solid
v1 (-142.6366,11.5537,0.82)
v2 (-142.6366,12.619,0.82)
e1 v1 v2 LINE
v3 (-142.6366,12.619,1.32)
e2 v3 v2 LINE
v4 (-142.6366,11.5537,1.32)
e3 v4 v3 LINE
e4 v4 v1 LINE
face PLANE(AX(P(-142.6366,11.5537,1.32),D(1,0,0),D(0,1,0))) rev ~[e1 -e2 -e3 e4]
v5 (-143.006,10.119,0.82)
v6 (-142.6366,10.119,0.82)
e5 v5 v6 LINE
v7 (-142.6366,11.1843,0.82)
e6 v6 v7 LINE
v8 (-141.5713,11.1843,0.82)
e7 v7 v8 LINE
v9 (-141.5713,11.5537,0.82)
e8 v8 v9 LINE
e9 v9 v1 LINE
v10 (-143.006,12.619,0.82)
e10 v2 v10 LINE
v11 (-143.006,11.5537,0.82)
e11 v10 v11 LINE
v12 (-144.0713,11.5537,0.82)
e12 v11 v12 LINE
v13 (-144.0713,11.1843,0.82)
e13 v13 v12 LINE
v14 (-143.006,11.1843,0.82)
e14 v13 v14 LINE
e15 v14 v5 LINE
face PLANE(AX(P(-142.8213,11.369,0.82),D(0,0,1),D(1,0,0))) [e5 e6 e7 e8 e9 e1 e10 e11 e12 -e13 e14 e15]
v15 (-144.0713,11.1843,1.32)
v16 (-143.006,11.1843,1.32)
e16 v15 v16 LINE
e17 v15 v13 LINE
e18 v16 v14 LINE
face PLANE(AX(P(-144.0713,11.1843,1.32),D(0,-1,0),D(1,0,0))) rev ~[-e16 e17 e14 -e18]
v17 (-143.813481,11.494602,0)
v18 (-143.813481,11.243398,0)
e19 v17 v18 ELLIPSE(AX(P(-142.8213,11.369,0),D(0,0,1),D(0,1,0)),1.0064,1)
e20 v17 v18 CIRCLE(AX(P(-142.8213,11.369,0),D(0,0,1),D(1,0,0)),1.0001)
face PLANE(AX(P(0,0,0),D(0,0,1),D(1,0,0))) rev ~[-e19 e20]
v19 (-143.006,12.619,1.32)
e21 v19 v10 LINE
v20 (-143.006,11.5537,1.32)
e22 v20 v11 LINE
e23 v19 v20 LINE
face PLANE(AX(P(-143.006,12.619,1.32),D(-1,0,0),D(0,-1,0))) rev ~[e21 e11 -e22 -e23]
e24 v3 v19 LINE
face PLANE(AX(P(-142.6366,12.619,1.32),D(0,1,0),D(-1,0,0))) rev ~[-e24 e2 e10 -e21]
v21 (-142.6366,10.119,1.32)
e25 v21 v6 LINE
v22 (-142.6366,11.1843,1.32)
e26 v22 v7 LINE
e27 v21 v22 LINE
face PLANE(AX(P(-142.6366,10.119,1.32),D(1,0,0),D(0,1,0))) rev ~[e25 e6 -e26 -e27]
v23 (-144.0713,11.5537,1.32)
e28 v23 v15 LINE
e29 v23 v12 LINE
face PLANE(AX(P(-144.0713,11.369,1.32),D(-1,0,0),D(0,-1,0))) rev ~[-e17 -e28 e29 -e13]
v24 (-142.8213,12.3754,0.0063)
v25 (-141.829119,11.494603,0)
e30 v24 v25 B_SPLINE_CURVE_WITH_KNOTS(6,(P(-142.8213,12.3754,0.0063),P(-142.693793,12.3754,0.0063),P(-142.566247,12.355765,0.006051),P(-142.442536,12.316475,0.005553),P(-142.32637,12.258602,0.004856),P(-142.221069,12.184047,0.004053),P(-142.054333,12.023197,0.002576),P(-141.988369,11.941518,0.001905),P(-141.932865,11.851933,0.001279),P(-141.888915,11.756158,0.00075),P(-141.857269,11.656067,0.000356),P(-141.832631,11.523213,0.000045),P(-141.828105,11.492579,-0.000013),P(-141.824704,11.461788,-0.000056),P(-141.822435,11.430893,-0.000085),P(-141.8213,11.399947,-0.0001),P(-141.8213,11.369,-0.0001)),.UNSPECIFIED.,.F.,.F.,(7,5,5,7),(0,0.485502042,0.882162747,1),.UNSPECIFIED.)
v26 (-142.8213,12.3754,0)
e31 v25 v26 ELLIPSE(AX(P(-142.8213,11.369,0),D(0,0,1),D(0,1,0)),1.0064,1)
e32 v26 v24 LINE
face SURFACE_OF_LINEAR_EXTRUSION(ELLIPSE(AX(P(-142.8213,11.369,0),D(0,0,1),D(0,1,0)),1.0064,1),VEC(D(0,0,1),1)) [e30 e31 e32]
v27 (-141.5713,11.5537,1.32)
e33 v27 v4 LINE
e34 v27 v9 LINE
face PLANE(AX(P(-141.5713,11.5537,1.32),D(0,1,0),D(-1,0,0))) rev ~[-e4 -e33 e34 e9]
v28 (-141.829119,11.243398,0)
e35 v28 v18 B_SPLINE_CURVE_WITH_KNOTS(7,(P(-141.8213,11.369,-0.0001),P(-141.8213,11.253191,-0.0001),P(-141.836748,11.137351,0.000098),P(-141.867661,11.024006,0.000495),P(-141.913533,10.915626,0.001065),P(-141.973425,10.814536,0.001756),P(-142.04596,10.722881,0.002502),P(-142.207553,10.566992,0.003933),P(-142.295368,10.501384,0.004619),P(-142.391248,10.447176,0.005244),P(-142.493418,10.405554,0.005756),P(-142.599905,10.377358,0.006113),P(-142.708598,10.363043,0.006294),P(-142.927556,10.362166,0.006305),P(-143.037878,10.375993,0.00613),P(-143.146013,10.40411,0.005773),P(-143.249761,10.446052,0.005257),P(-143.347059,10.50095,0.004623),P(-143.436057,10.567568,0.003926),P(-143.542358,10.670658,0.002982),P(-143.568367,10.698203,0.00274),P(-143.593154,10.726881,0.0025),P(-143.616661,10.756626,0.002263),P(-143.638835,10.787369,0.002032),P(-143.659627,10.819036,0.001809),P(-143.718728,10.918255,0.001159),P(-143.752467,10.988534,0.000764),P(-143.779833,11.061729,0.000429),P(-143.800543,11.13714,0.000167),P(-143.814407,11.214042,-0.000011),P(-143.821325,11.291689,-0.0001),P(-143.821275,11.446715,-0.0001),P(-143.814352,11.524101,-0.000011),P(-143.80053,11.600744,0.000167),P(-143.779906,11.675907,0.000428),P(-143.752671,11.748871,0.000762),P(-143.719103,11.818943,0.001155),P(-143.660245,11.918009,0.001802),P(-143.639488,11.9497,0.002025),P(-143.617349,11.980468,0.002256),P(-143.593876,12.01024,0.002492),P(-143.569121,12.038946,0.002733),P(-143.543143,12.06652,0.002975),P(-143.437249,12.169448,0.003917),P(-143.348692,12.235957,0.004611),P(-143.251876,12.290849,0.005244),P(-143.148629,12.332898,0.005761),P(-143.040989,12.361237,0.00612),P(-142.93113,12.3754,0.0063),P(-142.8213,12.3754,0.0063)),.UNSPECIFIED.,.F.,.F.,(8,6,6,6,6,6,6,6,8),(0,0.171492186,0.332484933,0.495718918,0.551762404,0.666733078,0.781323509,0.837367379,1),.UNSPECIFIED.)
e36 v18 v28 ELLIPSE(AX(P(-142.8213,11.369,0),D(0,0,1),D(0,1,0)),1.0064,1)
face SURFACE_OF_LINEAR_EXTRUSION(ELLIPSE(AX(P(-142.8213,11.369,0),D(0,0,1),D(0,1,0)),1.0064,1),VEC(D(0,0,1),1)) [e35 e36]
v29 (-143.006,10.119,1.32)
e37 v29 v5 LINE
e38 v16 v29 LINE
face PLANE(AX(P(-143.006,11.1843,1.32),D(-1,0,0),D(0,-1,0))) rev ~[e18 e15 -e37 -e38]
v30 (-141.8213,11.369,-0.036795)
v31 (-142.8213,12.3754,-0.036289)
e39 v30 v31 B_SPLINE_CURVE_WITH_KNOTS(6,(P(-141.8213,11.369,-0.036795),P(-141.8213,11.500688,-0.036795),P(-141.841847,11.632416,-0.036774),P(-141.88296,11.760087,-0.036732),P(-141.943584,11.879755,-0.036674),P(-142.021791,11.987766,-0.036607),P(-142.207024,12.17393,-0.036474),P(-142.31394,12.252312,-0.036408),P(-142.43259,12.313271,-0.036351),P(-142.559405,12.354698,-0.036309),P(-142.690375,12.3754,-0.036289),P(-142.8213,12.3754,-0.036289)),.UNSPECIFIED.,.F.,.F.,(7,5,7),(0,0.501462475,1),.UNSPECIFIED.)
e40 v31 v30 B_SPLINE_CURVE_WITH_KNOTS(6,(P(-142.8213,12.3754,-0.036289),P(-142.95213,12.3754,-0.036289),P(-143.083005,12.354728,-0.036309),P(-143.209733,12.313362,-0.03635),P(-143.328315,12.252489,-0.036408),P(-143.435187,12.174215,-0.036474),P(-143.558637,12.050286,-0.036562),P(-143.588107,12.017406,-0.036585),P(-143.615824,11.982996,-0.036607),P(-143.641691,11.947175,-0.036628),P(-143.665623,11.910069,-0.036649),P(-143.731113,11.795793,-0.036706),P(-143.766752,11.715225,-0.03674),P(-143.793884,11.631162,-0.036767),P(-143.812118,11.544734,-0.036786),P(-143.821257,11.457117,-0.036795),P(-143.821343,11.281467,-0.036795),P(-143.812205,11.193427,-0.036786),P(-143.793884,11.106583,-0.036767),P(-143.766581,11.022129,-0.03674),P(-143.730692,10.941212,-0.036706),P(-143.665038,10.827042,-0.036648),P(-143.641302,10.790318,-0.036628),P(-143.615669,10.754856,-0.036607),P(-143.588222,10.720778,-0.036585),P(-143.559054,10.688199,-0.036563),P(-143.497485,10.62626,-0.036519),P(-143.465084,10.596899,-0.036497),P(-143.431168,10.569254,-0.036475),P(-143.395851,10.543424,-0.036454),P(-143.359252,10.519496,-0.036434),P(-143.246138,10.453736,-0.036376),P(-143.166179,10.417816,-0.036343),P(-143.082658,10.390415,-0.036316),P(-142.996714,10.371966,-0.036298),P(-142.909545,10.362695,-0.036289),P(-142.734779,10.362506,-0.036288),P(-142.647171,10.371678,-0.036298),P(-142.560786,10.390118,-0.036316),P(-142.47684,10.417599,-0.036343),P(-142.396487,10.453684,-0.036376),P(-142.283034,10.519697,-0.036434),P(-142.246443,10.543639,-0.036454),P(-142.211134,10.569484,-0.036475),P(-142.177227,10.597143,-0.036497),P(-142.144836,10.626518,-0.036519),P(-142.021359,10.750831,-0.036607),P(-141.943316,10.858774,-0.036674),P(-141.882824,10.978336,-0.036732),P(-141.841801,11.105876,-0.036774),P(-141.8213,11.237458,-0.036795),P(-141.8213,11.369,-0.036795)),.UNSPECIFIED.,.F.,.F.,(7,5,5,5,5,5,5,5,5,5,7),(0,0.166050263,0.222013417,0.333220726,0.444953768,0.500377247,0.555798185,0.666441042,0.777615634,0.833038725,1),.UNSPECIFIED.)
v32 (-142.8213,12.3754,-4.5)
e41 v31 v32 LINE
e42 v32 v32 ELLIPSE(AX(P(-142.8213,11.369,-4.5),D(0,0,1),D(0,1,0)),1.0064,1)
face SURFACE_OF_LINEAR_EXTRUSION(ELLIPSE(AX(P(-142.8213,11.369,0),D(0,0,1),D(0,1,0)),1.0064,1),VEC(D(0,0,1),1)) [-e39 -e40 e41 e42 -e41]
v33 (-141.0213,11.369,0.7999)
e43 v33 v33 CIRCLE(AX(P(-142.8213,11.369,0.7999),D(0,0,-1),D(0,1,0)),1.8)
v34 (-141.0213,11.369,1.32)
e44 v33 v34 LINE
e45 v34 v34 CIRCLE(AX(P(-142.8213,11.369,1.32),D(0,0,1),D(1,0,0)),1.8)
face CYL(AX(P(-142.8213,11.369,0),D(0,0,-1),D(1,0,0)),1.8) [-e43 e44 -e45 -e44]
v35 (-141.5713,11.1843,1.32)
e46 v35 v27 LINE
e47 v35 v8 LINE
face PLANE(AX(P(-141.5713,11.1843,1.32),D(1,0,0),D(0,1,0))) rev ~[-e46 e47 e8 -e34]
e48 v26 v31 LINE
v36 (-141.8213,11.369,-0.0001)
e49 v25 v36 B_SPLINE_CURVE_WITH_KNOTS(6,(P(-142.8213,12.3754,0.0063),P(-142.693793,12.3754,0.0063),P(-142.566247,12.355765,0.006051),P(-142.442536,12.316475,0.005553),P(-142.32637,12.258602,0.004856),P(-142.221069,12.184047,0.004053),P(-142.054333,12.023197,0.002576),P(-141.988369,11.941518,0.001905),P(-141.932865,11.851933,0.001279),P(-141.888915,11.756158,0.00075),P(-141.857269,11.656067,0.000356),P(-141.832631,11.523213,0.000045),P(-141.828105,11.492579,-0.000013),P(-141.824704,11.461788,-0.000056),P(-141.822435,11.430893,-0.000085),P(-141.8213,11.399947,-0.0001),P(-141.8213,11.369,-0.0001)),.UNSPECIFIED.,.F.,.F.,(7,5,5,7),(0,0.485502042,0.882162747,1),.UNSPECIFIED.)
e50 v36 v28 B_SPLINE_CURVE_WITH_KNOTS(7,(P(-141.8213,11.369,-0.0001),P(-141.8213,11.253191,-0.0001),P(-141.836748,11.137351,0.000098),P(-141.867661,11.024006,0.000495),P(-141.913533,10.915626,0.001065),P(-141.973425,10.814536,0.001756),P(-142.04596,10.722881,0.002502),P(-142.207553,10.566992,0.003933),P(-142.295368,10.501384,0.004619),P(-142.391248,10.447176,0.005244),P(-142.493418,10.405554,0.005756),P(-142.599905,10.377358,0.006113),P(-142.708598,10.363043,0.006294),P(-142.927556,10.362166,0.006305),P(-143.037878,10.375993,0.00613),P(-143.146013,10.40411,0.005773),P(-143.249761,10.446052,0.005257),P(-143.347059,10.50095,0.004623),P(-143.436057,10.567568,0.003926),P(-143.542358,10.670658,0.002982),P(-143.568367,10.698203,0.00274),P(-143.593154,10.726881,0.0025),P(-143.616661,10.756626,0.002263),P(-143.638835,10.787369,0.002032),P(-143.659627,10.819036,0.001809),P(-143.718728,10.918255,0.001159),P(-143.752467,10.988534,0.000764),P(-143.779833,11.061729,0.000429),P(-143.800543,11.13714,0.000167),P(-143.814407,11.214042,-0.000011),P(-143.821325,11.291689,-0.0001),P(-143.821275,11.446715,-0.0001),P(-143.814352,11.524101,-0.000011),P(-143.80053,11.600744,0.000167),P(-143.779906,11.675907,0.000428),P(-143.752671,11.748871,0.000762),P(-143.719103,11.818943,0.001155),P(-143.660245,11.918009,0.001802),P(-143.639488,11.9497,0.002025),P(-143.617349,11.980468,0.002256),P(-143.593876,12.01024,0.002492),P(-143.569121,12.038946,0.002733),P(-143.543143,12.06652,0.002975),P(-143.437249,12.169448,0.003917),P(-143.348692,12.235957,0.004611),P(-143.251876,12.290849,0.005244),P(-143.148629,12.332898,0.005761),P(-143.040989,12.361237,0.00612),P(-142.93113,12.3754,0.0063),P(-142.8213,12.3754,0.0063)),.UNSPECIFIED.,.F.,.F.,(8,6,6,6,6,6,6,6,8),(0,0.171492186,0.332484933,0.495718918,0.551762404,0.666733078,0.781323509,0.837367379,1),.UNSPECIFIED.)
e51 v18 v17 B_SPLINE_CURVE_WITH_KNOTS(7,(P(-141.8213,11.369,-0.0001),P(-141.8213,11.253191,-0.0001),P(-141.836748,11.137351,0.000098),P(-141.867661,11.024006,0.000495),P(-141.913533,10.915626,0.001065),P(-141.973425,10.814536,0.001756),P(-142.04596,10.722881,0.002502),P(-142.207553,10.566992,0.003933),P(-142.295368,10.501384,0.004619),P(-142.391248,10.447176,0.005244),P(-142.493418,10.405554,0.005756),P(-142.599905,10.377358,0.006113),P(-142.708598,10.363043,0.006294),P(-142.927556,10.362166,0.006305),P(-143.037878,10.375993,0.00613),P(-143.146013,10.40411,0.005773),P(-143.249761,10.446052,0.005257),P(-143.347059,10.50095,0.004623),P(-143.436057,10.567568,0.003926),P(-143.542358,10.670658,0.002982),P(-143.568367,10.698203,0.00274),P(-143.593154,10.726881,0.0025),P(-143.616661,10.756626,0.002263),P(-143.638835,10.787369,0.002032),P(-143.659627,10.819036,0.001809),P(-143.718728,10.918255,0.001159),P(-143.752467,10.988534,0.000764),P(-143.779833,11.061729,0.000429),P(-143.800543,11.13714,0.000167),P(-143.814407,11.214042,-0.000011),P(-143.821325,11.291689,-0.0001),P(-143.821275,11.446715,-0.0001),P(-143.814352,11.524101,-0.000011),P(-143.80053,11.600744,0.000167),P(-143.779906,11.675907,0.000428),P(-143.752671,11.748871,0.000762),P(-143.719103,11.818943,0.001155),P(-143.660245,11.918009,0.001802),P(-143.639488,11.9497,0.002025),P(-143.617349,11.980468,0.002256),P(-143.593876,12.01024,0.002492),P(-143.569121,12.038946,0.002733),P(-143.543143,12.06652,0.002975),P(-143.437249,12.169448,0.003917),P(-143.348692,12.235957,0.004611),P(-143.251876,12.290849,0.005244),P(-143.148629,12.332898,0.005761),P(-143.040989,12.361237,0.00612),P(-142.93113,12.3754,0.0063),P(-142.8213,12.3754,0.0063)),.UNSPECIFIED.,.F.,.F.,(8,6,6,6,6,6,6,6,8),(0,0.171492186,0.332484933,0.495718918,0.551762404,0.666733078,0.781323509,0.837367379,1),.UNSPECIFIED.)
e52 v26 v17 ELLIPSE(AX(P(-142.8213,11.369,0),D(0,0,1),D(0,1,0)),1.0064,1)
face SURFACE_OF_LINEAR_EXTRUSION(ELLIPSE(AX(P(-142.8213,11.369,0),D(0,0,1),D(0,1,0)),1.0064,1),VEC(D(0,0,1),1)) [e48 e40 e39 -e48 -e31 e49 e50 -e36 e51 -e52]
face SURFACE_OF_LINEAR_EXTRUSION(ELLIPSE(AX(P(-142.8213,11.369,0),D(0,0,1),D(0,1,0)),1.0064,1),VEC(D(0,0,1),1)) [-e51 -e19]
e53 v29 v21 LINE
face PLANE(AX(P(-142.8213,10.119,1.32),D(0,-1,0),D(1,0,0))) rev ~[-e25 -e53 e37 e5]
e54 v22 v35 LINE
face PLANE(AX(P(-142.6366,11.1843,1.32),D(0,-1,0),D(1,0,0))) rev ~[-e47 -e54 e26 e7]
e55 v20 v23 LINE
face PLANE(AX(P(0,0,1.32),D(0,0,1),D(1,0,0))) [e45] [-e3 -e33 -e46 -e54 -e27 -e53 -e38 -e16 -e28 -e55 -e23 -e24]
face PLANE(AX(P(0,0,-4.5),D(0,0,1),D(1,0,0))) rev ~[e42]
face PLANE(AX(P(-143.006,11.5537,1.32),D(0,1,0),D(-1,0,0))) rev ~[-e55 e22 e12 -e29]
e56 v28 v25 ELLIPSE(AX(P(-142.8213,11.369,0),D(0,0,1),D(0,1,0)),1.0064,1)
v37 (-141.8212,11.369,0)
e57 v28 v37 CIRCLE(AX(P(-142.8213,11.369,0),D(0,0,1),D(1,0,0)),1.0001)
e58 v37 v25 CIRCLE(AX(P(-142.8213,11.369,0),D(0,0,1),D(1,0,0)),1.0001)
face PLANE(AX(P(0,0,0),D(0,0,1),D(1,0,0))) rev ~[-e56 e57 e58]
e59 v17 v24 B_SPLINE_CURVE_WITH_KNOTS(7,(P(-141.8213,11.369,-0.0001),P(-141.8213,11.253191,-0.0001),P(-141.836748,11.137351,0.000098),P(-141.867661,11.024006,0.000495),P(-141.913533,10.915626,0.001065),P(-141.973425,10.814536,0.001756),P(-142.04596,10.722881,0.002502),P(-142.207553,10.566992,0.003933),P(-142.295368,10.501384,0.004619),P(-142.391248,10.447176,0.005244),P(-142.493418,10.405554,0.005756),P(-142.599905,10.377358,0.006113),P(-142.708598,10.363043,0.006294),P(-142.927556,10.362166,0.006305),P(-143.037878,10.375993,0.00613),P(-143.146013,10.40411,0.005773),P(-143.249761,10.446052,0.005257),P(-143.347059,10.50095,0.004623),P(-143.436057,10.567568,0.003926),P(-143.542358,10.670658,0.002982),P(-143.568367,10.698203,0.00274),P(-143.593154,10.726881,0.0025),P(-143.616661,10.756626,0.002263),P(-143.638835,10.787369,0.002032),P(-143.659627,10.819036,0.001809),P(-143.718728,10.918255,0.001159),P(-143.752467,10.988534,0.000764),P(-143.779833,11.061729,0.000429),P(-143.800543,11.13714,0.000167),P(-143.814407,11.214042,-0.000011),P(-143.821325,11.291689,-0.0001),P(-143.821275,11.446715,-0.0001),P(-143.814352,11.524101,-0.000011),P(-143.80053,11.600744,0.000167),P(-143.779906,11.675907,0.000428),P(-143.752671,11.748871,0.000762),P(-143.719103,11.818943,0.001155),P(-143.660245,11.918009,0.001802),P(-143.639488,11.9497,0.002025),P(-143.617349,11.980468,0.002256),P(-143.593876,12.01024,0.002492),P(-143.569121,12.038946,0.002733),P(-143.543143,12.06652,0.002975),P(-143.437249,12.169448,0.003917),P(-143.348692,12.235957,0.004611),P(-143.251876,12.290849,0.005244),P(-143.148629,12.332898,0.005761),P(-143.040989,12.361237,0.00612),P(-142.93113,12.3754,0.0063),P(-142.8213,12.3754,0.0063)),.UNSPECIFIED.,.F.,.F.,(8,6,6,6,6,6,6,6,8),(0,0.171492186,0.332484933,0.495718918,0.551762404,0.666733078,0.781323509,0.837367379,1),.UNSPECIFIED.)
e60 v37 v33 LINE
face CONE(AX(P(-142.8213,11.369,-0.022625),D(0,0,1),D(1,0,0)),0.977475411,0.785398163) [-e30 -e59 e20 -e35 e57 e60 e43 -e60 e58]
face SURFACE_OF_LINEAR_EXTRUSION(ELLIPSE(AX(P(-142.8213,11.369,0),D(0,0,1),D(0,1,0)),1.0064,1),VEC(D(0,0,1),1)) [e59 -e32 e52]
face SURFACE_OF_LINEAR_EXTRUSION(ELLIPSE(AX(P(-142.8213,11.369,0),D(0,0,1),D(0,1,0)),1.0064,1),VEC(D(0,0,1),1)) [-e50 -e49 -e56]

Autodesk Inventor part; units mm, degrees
ref_plane "YZ Plane" through (0, 0, 0) normal (1, 0, 0) x (0, 1, 0)
ref_plane "XZ Plane" through (0, 0, 0) normal (0, 1, 0) x (-1, 0, 0)
ref_plane "XY Plane" through (0, 0, 0) normal (0, 0, 1) x (1, 0, 0)
sketch "Sketch1" plane through (0, 0, 0) normal (0, 0, 1) x (1, 0, 0)
  ellipse E0 centre (-142.8213, 11.369) end of major axis (-142.8213, 12.3754) minor radius 1
  point P0 (0, 0)
  dimension "d1" = 1.0064
extrude "Extrusion1" add sketch "Sketch1" against normal blind 4.5
sketch "Sketch2" plane through (0, 0, 0) normal (0, 0, 1) x (1, 0, 0)
  ellipse E0 centre (-142.8213, 11.369) end of major axis (-142.8213, 12.3754) minor radius 1 projected
  circle A0 centre (-142.8213, 11.369) radius 1.8
  point P0 (0, 0)
  dimension "d4" = 3.6
extrude "Extrusion2" add sketch "Sketch2" along normal blind 1.32 contours E0 | A0
ref_plane "Work Plane1" through (-142.8213, 11.369, 0.82) normal (0, 0, 1) x (1, 0, 0)
chamfer "Chamfer1" distance 0.7999 angle 45 1 edges at (-144.6213, 11.369, 0)
sketch "Sketch3" plane through (-142.8213, 11.369, 1.32) normal (0, 0, 1) x (1, 0, 0)
  line L0 (0, 0) -> (0, -1.25)
  line L1 (0, 0) -> (0, 1.25)
  line L2 (0, 0) -> (1.25, 0)
  line L3 (1.25, 0) -> (-1.25, 0)
  line L4 (-1.25, -0.1847) -> (1.25, -0.1847)
  line L5 (1.25, -0.1847) -> (1.25, 0.1847)
  line L6 (1.25, 0.1847) -> (-1.25, 0.1847)
  line L7 (-1.25, 0.1847) -> (-1.25, -0.1847)
  line L8 (-1.25, -0.1847) -> (1.25, 0.1847) construction
  line L9 (1.25, -0.1847) -> (-1.25, 0.1847) construction
  line L10 (-0.1847, -1.25) -> (0.1847, -1.25)
  line L11 (0.1847, -1.25) -> (0.1847, 1.25)
  line L12 (0.1847, 1.25) -> (-0.1847, 1.25)
  line L13 (-0.1847, 1.25) -> (-0.1847, -1.25)
  line L14 (-0.1847, -1.25) -> (0.1847, 1.25) construction
  line L15 (0.1847, -1.25) -> (-0.1847, 1.25) construction
  point P0 (142.8213, -11.369)
  point P1 (0.1847, 0.1847)
  point P2 (-0.1847, 0.1847)
  point P3 (-0.1847, -0.1847)
  point P4 (0.1847, -0.1847)
  dimension "d11" = 1.25
  dimension "d12" = 1.25
  dimension "d13" = 1.25
  dimension "d14" = 2.5
extrude "Extrusion3" cut sketch "Sketch3" against normal blind 0.5
properties part number "m2 screw"
